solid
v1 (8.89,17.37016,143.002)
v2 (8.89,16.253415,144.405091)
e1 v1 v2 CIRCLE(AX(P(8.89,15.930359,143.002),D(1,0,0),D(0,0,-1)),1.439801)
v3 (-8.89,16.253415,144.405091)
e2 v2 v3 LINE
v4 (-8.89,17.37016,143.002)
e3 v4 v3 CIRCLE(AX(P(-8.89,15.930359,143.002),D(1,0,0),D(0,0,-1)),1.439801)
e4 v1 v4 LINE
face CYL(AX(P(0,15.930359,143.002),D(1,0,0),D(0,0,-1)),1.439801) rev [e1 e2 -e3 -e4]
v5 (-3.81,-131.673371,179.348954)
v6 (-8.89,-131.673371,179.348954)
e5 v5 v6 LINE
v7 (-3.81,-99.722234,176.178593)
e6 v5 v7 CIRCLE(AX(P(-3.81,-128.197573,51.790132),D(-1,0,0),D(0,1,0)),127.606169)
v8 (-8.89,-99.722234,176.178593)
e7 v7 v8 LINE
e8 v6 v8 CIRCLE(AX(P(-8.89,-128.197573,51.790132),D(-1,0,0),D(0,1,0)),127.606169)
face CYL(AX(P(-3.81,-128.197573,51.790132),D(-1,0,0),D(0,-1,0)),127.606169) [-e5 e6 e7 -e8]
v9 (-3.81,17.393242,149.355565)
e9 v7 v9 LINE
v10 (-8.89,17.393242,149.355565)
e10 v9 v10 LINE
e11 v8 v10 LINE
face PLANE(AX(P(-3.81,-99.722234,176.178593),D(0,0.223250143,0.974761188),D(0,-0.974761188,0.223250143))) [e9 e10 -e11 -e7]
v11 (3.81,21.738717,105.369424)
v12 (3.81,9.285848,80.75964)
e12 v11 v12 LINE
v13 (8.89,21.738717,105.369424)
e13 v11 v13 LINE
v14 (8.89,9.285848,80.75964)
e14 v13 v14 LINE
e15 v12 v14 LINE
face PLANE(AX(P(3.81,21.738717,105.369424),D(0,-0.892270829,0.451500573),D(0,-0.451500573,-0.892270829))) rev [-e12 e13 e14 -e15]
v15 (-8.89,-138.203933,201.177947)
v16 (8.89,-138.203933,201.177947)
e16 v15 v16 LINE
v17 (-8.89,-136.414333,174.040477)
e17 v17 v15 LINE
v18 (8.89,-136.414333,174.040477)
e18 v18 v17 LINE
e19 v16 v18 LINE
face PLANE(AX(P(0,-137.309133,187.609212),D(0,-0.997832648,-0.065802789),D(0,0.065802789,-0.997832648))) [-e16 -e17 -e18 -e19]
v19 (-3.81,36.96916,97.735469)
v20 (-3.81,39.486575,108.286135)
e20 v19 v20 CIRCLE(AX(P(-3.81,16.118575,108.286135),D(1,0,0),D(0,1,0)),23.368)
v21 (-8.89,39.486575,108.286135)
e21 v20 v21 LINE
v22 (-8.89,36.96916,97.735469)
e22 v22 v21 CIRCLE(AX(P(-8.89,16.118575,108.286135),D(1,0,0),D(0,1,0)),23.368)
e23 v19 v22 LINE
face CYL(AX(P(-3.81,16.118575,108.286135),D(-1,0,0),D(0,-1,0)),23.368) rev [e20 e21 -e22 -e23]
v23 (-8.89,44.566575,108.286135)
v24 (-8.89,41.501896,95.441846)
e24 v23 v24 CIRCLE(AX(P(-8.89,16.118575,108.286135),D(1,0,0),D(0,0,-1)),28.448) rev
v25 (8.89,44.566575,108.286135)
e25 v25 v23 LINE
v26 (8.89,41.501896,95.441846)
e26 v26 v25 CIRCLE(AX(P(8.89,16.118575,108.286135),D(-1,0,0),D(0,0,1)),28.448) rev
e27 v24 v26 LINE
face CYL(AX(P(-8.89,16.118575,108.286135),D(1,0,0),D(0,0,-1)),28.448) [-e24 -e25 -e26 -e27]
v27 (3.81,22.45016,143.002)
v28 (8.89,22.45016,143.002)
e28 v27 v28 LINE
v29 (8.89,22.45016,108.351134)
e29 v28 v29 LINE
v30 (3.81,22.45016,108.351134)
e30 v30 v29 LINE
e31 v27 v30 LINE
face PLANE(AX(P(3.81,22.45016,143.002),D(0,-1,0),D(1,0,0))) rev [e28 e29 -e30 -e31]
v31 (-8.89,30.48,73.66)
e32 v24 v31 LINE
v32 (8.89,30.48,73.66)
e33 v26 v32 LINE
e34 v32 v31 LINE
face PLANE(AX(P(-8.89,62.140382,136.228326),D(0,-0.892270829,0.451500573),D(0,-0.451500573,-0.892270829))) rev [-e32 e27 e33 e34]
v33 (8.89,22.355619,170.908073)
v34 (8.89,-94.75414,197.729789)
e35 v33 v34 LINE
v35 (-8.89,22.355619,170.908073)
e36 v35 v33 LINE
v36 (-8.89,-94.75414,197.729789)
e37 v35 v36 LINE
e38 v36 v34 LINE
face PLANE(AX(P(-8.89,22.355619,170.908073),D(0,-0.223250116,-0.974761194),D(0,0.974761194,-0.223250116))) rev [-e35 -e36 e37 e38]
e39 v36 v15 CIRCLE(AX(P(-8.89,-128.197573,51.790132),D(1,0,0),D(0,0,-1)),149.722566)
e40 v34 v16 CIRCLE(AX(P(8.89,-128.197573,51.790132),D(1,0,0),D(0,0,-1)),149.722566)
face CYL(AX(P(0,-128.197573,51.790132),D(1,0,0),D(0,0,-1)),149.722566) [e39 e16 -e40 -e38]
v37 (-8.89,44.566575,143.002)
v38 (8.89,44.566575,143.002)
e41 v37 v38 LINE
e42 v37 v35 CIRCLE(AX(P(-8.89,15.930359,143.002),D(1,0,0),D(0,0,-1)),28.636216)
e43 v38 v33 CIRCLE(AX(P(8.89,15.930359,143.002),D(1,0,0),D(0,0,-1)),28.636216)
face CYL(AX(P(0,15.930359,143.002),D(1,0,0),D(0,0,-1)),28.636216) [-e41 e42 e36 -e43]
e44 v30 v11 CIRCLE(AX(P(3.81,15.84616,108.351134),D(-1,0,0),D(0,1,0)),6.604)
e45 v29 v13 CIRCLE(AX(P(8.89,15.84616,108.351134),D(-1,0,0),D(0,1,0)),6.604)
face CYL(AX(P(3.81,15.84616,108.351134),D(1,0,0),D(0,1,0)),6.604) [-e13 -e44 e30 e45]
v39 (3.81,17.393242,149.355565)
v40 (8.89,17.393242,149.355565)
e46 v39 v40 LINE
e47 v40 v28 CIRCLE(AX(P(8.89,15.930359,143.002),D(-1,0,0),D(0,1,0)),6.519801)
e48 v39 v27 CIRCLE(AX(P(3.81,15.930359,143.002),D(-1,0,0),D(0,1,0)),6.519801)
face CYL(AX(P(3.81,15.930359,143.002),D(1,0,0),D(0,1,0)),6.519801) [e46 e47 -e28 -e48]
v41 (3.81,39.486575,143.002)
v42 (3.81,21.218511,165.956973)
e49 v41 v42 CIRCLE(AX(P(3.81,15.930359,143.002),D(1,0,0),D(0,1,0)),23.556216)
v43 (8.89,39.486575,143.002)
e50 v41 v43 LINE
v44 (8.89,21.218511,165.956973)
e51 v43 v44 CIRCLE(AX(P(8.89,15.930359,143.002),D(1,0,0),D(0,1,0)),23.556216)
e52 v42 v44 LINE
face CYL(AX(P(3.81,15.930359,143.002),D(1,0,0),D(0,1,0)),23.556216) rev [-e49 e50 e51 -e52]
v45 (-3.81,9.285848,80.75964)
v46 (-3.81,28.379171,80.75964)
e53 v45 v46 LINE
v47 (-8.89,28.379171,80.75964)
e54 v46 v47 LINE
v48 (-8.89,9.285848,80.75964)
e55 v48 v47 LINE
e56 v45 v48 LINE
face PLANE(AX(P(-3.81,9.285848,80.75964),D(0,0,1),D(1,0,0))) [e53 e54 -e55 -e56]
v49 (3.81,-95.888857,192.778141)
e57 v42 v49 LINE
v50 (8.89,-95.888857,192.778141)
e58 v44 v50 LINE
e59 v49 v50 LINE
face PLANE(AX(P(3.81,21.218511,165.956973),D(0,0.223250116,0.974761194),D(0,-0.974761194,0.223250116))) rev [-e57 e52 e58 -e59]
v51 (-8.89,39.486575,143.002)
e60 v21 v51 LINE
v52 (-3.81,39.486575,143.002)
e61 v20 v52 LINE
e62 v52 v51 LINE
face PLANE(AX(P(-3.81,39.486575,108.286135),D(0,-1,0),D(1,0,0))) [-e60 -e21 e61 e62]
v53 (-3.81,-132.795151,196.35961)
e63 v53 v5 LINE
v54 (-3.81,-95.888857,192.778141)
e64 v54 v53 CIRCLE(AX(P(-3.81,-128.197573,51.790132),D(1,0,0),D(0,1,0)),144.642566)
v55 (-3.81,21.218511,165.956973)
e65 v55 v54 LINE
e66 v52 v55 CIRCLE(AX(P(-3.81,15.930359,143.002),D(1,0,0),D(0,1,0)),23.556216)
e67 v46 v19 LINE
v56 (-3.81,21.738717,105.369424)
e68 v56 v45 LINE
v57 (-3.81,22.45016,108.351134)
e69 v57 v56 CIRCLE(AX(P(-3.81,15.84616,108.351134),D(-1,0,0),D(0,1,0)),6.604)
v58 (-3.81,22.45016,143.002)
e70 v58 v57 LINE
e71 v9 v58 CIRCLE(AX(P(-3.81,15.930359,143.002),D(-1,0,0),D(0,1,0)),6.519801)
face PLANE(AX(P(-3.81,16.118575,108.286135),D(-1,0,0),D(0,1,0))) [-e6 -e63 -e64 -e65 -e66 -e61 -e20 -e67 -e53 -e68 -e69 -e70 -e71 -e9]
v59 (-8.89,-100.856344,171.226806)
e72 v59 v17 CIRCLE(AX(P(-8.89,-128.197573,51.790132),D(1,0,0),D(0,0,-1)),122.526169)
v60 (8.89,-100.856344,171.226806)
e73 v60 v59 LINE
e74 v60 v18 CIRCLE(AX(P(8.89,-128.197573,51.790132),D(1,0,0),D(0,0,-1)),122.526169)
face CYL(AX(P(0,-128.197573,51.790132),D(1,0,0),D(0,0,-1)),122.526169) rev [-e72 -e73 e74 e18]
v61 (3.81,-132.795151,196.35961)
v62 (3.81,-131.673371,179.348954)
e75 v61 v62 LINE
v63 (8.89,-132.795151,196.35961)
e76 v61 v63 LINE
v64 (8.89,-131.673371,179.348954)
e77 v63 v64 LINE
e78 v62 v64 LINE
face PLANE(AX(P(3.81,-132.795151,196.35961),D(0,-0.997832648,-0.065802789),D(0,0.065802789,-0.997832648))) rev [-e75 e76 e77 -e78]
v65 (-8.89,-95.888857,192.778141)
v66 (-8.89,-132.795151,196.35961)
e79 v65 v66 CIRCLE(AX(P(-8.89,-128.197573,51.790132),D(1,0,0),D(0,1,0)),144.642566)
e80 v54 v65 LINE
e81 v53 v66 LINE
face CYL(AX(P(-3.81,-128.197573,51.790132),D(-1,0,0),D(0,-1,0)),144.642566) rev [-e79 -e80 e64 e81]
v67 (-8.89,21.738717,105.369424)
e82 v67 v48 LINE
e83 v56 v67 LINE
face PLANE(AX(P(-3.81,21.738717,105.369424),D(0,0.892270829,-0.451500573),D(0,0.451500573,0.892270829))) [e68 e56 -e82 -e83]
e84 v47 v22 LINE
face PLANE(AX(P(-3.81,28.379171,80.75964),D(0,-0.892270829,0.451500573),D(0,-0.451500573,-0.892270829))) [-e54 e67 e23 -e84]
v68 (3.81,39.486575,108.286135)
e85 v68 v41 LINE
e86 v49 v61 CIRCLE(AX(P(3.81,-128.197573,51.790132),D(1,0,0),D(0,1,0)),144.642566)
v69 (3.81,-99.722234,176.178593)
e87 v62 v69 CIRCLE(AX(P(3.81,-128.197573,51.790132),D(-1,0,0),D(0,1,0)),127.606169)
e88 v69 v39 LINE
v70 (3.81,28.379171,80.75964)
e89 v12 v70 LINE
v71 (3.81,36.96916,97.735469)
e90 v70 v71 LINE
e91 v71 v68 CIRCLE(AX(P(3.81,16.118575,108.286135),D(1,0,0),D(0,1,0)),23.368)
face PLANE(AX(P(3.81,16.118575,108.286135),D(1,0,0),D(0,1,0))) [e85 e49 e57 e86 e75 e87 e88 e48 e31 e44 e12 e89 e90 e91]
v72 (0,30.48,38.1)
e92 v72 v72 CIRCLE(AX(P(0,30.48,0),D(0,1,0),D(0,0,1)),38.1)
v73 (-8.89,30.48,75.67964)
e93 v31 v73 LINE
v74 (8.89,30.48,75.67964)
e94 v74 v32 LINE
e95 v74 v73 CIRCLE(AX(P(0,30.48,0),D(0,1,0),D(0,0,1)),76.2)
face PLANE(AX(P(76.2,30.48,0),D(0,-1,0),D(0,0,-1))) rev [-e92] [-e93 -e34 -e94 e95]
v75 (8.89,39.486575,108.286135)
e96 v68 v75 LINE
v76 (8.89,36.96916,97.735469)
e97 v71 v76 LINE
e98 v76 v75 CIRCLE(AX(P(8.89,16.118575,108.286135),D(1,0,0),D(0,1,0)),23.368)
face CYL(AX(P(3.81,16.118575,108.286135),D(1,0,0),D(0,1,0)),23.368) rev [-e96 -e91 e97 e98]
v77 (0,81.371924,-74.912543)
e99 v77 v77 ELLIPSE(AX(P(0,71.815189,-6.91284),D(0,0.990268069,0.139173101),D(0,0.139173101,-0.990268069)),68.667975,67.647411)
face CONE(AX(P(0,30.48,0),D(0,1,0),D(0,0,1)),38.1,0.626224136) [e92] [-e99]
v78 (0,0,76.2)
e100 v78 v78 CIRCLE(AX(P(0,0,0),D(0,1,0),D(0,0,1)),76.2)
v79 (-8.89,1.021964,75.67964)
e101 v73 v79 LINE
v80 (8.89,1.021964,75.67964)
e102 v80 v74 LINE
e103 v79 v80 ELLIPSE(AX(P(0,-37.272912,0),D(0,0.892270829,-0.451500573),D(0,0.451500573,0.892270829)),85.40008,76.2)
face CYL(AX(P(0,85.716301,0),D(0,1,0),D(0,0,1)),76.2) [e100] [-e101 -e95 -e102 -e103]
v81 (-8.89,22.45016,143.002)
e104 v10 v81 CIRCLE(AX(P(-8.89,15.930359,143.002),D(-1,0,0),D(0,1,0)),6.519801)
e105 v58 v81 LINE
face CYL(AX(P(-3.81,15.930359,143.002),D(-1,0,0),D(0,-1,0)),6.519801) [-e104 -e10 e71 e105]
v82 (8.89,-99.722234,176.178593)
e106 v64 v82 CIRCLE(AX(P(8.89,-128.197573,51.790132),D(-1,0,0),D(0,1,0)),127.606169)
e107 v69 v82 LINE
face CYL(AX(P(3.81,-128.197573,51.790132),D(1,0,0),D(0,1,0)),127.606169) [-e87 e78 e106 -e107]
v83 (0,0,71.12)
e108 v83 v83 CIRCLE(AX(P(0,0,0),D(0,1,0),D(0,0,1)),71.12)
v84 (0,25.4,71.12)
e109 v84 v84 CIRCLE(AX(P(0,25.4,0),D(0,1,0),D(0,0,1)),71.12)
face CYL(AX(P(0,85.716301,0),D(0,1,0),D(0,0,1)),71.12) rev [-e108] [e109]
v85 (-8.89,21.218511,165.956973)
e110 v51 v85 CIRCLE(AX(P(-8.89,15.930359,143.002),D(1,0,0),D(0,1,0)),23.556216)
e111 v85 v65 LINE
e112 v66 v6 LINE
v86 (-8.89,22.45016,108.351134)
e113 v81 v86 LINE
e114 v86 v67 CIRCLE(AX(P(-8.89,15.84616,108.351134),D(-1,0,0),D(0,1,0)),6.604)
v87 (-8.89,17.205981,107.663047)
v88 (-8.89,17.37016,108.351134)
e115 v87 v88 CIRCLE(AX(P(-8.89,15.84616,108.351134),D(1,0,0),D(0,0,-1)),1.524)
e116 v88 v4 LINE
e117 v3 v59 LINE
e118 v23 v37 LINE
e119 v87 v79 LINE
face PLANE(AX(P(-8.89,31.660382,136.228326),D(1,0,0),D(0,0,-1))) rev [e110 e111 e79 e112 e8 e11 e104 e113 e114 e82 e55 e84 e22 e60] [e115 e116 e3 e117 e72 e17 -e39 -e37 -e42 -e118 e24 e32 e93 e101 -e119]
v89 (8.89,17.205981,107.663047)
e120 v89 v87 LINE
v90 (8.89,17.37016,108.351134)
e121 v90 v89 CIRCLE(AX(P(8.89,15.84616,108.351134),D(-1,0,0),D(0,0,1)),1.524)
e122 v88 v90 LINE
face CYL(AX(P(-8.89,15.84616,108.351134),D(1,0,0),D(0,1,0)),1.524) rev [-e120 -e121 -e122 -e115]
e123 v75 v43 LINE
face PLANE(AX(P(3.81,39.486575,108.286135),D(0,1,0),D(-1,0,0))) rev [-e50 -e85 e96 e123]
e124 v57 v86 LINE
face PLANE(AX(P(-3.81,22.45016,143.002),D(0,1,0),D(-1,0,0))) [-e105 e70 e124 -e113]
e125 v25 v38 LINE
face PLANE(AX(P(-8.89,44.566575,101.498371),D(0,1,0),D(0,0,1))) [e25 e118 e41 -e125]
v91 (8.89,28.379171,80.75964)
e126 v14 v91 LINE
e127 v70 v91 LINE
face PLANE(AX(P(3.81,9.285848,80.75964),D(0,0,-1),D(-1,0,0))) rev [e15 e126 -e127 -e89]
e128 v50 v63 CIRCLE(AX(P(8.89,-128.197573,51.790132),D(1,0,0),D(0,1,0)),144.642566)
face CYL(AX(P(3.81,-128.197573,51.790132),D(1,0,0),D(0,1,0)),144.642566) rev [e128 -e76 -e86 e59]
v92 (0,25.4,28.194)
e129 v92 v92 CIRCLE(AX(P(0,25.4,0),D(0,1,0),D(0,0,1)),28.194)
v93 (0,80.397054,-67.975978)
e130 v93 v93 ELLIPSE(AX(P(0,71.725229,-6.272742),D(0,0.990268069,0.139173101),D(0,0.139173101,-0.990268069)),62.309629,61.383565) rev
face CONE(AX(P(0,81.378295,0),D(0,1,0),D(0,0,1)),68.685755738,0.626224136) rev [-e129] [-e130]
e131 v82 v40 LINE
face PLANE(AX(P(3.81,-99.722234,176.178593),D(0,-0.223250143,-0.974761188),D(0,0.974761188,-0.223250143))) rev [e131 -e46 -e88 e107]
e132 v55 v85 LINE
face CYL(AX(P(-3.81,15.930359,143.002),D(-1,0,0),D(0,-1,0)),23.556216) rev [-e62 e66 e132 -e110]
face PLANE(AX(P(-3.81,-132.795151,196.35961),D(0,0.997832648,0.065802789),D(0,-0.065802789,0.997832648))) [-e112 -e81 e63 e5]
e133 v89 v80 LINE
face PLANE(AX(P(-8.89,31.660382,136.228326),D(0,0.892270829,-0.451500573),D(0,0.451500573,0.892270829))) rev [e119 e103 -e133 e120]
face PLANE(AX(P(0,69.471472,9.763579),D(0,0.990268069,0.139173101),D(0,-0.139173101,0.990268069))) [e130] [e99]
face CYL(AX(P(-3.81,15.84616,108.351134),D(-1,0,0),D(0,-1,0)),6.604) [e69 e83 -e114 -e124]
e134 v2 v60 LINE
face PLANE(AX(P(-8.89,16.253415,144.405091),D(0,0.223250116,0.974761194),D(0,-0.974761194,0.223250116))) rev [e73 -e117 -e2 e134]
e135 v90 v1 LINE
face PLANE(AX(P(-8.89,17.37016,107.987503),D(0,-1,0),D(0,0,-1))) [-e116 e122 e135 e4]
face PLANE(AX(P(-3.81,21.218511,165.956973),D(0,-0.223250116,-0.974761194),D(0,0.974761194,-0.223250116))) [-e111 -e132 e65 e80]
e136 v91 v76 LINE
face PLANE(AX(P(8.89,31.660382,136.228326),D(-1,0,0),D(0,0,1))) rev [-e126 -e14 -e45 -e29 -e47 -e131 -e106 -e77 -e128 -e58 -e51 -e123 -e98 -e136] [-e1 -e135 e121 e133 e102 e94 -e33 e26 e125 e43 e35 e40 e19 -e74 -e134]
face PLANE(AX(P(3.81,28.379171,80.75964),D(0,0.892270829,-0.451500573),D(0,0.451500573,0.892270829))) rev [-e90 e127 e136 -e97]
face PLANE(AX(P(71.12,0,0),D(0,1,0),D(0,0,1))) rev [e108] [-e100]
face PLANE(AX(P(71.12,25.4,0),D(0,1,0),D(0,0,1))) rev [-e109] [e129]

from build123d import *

# Parameters (mm, degrees)
SWEEP2_START       = -8.89
SWEEP2_DEPTH       = 17.78
FILLET1_R          = 28.448
FILLET2_R          = 1.524
CUT_EXTRUDE1_DEPTH = 5.08


with BuildPart() as part:
    # Sketch1 → Revolve1 (revolve)
    with BuildSketch(Plane.XY, mode=Mode.PRIVATE) as revolve1_sk:
        Polygon((71.12, 25.4), (28.194, 25.4), (68.685755738, 81.378294554), (75.018953762, 81.51903327), (38.1, 30.48), (76.2, 30.48), (76.2, 0), (71.12, 0), align=None)
    revolve(revolve1_sk.sketch.rotate(Axis((0, 85.716301318, 0), (0, -1, 0)), 90), axis=Axis((0, 85.716301318, 0), (0, -1, 0)))

    # SurfaceCut1
    split(bisect_by=Plane(origin=(0, 69.471471591, 9.763578605), x_dir=(-1, 0, 0), z_dir=(0, 0.9902680687415703, 0.13917310096006574)), keep=Keep.BOTTOM)

    # Sweep2: read off the stored shape, not the designer's step
    # Sweep2 outline → Sweep2 (add)
    with BuildSketch(Plane.YZ.offset(SWEEP2_START)):
        with BuildLine():
            Line((17.370160471, 143.002), (17.370160471, 107.987503449))
            Line((17.370160471, 107.987503449), (1.021963911, 75.67963993))
            Line((1.021963911, 75.67963993), (30.48, 75.67963993))
            Line((30.48, 75.67963993), (30.48, 73.66))
            Line((30.48, 73.66), (44.566575341, 101.498370543))
            Line((44.566575341, 101.498370543), (44.566575341, 143.002))
            ThreePointArc((44.566575341, 143.002), (38.336028216, 160.835083682), (22.355619148, 170.908073165))
            Line((22.355619148, 170.908073165), (-94.754140244, 197.729788602))
            ThreePointArc((-94.754140244, 197.729788602), (-116.352888931, 201.043440298), (-138.203933305, 201.177947268))
            Line((-138.203933305, 201.177947268), (-136.414333354, 174.040476608))
            ThreePointArc((-136.414333354, 174.040476608), (-118.532403269, 173.934498987), (-100.856344498, 171.226806034))
            Line((-100.856344498, 171.226806034), (16.253414894, 144.405090597))
            ThreePointArc((16.253414894, 144.405090597), (17.056894537, 143.898630346), (17.370160471, 143.002))
        make_face()
    extrude(amount=SWEEP2_DEPTH)

    # Fillet1
    fillet1_edges = [part.edges().sort_by_distance(p)[0] for p in [
        (0, 44.566575341, 101.498370543),
    ]]
    fillet(fillet1_edges, radius=FILLET1_R)

    # Fillet2
    fillet2_edges = [part.edges().sort_by_distance(p)[0] for p in [
        (0, 17.370160471, 107.987503449),
    ]]
    fillet(fillet2_edges, radius=FILLET2_R)

    # Sketch7 → Cut-Extrude1 (cut)
    with BuildSketch(Plane(origin=(8.89, 0, 0), x_dir=(0, 0, -1), z_dir=(1, 0, 0))):
        with BuildLine():
            Line((-80.75963993, 9.28584823), (-80.75963993, 28.379170924))
            Line((-80.75963993, 28.379170924), (-97.73546941, 36.969160074))
            ThreePointArc((-97.73546941, 36.969160074), (-102.862715222, 38.848510317), (-108.286134805, 39.486575341))
            Line((-108.286134805, 39.486575341), (-143.002, 39.486575341))
            ThreePointArc((-143.002, 39.486575341), (-157.670443725, 34.362181678), (-165.956972893, 21.218510727))
            Line((-165.956972893, 21.218510727), (-192.778140508, -95.888856575))
            ThreePointArc((-192.778140508, -95.888856575), (-195.756406443, -114.226762874), (-196.359610136, -132.795150546))
            Line((-196.359610136, -132.795150546), (-179.348953739, -131.673370618))
            ThreePointArc((-179.348953739, -131.673370618), (-178.772717763, -115.597689457), (-176.178592901, -99.722233909))
            Line((-176.178592901, -99.722233909), (-149.355564845, 17.393241513))
            ThreePointArc((-149.355564845, 17.393241513), (-147.062179047, 21.031609572), (-143.002, 22.450160471))
            Line((-143.002, 22.450160471), (-108.351133677, 22.450160471))
            ThreePointArc((-108.351133677, 22.450160471), (-106.818428143, 22.269837747), (-105.369423892, 21.738717026))
            Line((-105.369423892, 21.738717026), (-80.75963993, 9.28584823))
        make_face()
    cut_extrude1 = extrude(amount=-CUT_EXTRUDE1_DEPTH, mode=Mode.SUBTRACT)

    # Mirror2: Cut-Extrude1 across plane
    add(cut_extrude1.mirror(Plane(origin=(0, 0, 0), x_dir=(0, 0, 1), z_dir=(1, 0, 0))), mode=Mode.SUBTRACT)


solid = part.part
